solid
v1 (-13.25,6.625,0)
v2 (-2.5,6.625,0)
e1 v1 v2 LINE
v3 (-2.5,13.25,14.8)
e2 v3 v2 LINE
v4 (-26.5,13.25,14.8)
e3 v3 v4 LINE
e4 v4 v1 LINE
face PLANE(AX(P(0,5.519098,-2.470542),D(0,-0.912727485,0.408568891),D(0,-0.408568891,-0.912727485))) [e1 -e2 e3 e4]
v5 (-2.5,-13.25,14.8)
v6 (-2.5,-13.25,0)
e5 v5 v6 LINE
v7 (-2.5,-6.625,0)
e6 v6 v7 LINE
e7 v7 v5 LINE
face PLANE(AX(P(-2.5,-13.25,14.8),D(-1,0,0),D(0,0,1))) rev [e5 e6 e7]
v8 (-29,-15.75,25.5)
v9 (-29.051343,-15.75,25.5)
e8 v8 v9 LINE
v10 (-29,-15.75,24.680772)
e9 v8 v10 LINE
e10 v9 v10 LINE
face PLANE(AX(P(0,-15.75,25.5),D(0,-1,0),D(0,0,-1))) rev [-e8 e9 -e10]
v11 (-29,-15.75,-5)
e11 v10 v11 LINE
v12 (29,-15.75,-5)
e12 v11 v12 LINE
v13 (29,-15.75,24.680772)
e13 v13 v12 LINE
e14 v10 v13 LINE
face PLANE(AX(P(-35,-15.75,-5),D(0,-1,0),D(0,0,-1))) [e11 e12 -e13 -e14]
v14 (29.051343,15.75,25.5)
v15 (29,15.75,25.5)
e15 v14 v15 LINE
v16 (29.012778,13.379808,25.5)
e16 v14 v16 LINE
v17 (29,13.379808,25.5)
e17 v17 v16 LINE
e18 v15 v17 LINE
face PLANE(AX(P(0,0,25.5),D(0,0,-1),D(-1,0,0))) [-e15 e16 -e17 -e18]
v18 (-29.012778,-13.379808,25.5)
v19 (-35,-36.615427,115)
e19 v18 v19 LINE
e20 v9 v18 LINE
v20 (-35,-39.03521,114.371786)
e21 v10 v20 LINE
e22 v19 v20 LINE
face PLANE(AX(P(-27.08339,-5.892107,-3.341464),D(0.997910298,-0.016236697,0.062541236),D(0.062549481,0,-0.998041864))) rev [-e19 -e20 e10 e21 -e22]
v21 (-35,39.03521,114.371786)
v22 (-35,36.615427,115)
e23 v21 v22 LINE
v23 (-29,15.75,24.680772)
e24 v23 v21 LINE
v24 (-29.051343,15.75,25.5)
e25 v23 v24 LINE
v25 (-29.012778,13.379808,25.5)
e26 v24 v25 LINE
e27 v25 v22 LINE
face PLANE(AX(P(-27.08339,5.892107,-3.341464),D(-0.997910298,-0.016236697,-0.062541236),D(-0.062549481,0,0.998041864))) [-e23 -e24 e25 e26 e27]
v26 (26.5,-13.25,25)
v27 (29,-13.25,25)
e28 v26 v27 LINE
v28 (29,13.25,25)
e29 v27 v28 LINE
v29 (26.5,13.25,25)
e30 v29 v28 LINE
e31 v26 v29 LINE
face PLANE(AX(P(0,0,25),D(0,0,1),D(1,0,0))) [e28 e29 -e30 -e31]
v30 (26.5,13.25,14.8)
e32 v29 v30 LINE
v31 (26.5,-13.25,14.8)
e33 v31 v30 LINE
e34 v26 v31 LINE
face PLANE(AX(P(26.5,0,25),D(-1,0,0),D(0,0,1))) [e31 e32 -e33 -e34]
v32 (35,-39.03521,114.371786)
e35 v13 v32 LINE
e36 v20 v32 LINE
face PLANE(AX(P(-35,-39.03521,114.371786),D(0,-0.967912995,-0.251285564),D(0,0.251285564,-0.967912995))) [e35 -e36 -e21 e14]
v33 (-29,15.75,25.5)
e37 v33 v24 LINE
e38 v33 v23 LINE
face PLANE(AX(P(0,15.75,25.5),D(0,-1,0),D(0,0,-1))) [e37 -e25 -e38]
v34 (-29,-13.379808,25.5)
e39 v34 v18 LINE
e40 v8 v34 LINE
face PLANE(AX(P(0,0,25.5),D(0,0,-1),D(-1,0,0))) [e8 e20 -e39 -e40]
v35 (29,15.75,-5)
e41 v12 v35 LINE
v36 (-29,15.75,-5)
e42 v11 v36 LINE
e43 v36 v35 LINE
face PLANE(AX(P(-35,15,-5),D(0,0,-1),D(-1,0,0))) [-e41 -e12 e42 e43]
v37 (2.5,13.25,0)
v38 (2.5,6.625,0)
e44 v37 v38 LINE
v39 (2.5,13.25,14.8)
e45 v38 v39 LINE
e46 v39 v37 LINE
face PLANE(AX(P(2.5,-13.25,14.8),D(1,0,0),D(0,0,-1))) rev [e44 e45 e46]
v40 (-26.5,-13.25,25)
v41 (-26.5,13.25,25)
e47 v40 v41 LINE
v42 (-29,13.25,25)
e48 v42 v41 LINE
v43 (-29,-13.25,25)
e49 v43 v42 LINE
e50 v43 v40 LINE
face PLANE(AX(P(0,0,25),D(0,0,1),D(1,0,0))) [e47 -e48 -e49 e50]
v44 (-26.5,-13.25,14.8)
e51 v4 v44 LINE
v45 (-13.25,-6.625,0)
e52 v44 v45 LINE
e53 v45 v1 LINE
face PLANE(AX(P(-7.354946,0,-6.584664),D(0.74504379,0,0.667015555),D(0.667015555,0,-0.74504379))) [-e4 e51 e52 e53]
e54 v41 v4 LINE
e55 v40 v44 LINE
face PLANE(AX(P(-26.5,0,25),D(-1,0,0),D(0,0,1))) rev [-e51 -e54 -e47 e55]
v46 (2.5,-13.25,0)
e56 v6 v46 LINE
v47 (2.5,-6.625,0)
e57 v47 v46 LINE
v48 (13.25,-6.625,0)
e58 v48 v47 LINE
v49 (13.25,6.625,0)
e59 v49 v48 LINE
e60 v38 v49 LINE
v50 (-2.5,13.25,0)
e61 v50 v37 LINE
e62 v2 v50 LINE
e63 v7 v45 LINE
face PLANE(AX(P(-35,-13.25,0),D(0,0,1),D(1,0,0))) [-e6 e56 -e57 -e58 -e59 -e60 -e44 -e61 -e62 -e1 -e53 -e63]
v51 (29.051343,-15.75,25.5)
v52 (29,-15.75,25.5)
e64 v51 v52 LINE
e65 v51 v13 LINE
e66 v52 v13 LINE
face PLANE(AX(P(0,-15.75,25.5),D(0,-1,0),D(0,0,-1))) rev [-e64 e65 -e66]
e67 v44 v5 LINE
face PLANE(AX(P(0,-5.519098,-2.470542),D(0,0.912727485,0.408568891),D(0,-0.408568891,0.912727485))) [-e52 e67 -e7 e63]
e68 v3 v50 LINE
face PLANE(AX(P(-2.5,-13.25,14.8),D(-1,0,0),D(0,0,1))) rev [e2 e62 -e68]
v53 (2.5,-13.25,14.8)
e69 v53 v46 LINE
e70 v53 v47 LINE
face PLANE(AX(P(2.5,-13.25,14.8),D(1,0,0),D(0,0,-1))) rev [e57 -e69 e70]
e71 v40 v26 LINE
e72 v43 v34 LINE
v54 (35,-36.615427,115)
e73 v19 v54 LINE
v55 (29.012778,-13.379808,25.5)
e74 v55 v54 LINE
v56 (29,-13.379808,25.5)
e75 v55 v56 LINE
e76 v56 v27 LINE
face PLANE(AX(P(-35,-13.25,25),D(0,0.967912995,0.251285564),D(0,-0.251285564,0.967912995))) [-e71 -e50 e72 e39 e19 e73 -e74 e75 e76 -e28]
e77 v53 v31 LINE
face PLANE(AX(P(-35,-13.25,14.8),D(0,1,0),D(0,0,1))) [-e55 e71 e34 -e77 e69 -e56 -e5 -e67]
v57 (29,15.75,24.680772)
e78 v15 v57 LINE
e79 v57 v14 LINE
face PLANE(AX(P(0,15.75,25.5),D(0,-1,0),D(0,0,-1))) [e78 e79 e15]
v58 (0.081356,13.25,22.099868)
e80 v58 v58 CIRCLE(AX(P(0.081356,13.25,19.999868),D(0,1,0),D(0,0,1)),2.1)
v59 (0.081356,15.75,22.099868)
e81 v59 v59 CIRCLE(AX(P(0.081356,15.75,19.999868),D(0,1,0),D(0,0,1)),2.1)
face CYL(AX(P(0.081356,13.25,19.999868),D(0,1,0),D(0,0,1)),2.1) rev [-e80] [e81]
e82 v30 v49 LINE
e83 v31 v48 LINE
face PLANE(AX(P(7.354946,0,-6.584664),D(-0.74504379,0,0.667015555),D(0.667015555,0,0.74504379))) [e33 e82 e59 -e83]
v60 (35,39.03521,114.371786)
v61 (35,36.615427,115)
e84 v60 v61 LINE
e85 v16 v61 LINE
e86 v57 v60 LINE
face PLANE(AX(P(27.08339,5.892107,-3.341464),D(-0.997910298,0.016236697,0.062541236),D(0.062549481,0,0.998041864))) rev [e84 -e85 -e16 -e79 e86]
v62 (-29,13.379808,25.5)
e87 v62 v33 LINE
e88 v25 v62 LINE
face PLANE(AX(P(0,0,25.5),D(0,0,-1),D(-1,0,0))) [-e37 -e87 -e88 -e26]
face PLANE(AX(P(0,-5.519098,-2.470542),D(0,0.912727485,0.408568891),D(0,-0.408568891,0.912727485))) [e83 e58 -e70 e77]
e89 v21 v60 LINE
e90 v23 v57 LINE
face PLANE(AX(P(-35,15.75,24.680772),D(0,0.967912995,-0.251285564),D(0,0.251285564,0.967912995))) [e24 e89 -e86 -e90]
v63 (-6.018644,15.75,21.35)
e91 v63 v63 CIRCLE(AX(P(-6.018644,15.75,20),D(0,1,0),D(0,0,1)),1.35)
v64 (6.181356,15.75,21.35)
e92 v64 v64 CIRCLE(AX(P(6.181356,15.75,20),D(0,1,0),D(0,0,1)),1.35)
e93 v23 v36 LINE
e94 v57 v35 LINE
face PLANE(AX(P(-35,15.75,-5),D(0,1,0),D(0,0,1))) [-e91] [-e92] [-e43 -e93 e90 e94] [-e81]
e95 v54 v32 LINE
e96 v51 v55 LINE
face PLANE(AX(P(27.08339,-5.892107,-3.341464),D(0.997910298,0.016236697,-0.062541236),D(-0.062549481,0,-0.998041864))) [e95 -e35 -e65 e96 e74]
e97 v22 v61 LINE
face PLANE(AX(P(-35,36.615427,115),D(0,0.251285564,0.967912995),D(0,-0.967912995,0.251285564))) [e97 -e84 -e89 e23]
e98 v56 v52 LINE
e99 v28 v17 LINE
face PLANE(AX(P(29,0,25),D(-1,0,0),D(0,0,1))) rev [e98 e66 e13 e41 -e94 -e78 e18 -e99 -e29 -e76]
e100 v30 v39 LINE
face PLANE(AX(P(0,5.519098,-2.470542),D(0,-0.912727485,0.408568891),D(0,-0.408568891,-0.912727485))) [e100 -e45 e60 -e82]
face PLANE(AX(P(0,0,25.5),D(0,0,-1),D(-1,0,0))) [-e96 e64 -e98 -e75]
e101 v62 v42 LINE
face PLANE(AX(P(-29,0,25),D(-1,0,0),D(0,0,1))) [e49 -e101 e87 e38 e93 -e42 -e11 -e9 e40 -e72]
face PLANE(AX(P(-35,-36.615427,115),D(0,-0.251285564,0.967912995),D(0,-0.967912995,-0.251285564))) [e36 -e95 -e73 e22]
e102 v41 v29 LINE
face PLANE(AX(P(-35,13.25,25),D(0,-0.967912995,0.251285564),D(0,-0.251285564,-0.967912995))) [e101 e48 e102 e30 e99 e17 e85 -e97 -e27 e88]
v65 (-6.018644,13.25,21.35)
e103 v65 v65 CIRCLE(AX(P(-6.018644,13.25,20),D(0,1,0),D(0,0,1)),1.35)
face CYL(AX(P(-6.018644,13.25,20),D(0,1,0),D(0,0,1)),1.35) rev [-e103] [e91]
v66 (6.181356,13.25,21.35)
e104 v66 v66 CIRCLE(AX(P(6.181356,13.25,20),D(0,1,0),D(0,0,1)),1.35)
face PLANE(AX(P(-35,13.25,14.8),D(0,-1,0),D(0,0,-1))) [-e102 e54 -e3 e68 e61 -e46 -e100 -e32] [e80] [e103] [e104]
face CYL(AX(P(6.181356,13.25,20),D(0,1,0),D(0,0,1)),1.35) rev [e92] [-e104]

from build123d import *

# Parameters (mm, degrees)
CROQUIS1_W                   = 53
CROQUIS1_H                   = 26.5
SALIENTE_EXTRUIR1_DEPTH      = 14.8
CROQUIS8_W                   = 5
CROQUIS8_H                   = 26.5
CORTAR_EXTRUIR2_DEPTH        = 14.8
SALIENTE_EXTRUIR2_DEPTH      = 35
SALIENTE_EXTRUIR2_DEPTH_BACK = 35
CROQUIS12_W                  = 2.5
CROQUIS12_H                  = 26.5
SALIENTE_EXTRUIR3_DEPTH      = 25
CROQUIS13_W                  = 6
CROQUIS13_H                  = 29.680771502
CORTAR_EXTRUIR3_DEPTH        = 31.5
CORTAR_EXTRUIR13_DEPTH       = 2.5
CORTAR_EXTRUIR14_DEPTH       = 2.5
CROQUIS17_W                  = 6
CROQUIS17_H                  = 31.5
CORTAR_EXTRUIR11_DEPTH       = 30.5
CROQUIS18_R                  = 2.1
CROQUIS18_R_2                = 1.35
CORTAR_EXTRUIR12_DEPTH       = 2.5


with BuildPart() as part:
    # Croquis1 → Saliente-Extruir1 (new body)
    with BuildSketch(Plane.XY):
        Rectangle(CROQUIS1_W, CROQUIS1_H)
    extrude(amount=SALIENTE_EXTRUIR1_DEPTH)

    # Croquis5 → Cortar-Recubrir3 section 0
    with BuildSketch(Plane.XY.offset(14.8)):
        with BuildLine():
            Line((-26.5, 13.25), (-26.5, -13.25))
            Line((-26.5, -13.25), (26.5, -13.25))
            Line((26.5, -13.25), (26.5, 13.25))
            Line((26.5, 13.25), (-26.5, 13.25))
        make_face()
    # Croquis6 → Cortar-Recubrir3 section 1
    with BuildSketch(Plane(origin=(0, 0, 0), x_dir=(-1, 0, 0), z_dir=(0, 0, -1))):
        with BuildLine():
            Line((-13.25, -6.625), (13.25, -6.625))
            Line((13.25, -6.625), (13.25, 6.625))
            Line((13.25, 6.625), (-13.25, 6.625))
            Line((-13.25, 6.625), (-13.25, -6.625))
        make_face()
    loft(mode=Mode.SUBTRACT)

    # Croquis8 → Cortar-Extruir2 (cut)
    with BuildSketch(Plane(origin=(0, 0, 0), x_dir=(-1, 0, 0), z_dir=(0, 0, -1))):
        Rectangle(CROQUIS8_W, CROQUIS8_H)
    extrude(amount=-CORTAR_EXTRUIR2_DEPTH, mode=Mode.SUBTRACT)


with BuildPart() as cortar_extruir2_piece_1:
    # of the separate pieces the step leaves, piece 1, a body of its own (cortar_extruir2_pieces)
    add(part.part.solids().sort_by_distance((-26.5, -13.25, 0))[0])



with BuildPart() as cortar_extruir2_piece_2:
    # of the separate pieces the step leaves, piece 2, a body of its own (cortar_extruir2_pieces)
    add(part.part.solids().sort_by_distance((2.5, -13.25, 0))[0])


with BuildPart() as cortar_extruir2_piece_1_1:
    add(cortar_extruir2_piece_1.part)

    add(cortar_extruir2_piece_2.part)  # Saliente-Extruir2 merges Cortar-Extruir2 piece 2
    # Croquis10 → Saliente-Extruir2 (add, two sides: drawn at the far end of the back side and taken through both)
    with BuildSketch(Plane(origin=(0, 0, 0), x_dir=(0, 0, -1), z_dir=(1, 0, 0)).offset(-SALIENTE_EXTRUIR2_DEPTH_BACK)):
        Polygon((-14.8, 13.25), (-25, 13.25), (-115, 36.615427319), (-114.371786091, 39.035209806), (-24.680771502, 15.75), (5, 15.75), (5, 15), (5, -15.75), (-24.680771502, -15.75), (-114.371786091, -39.035209806), (-115, -36.615427319), (-25, -13.25), (-14.8, -13.25), (0, -13.25), (0, 13.25), align=None)
    extrude(amount=SALIENTE_EXTRUIR2_DEPTH + SALIENTE_EXTRUIR2_DEPTH_BACK)

    # Croquis12 → Saliente-Extruir3 (add)
    with BuildSketch(Plane.XY):
        with Locations((-27.75, 0)):
            Rectangle(CROQUIS12_W, CROQUIS12_H)
        with Locations((27.75, 0)):
            Rectangle(CROQUIS12_W, CROQUIS12_H)
    extrude(amount=SALIENTE_EXTRUIR3_DEPTH)

    # Croquis13 → Cortar-Extruir3 (cut)
    with BuildSketch(Plane(origin=(0, 15.75, 0), x_dir=(1, 0, 0), z_dir=(0, 1, 0))):
        with Locations((-32, -9.840385751)):
            Rectangle(CROQUIS13_W, CROQUIS13_H)
        with Locations((32, -9.840385751)):
            Rectangle(CROQUIS13_W, CROQUIS13_H)
    extrude(amount=-CORTAR_EXTRUIR3_DEPTH, mode=Mode.SUBTRACT)

    # Croquis14 → Cortar-Extruir13 (cut)
    with BuildSketch(Plane(origin=(0, 8.752554668, -2.272301999), x_dir=(1, 0, 0), z_dir=(0, 0.9679129947926777, -0.25128556367501503))):
        Polygon((35, -27.846587086), (29, -27.846587086), (35, -120.510922694), align=None)
        Polygon((-35, -27.846587086), (-35, -120.510922694), (-29, -27.846587086), align=None)
    extrude(amount=-CORTAR_EXTRUIR13_DEPTH, mode=Mode.SUBTRACT)

    # Croquis16 → Cortar-Extruir14 (cut)
    with BuildSketch(Plane(origin=(0, -8.752554668, -2.272301999), x_dir=(1, 0, 0), z_dir=(0, -0.9679129947926624, -0.25128556367507404))):
        Polygon((-35, 27.846587086), (-29, 27.846587086), (-35, 120.510922694), align=None)
        Polygon((35, 27.846587086), (35, 120.510922694), (29, 27.846587086), align=None)
    extrude(amount=-CORTAR_EXTRUIR14_DEPTH, mode=Mode.SUBTRACT)

    # Croquis17 → Cortar-Extruir11 (cut)
    with BuildSketch(Plane(origin=(0, 0, -5), x_dir=(-1, 0, 0), z_dir=(0, 0, -1))):
        with Locations((-32, 0)):
            Rectangle(CROQUIS17_W, CROQUIS17_H)
        with Locations((32, 0)):
            Rectangle(CROQUIS17_W, CROQUIS17_H)
    extrude(amount=-CORTAR_EXTRUIR11_DEPTH, mode=Mode.SUBTRACT)

    # Croquis18 → Cortar-Extruir12 (cut)
    with BuildSketch(Plane(origin=(0, 15.75, 0), x_dir=(1, 0, 0), z_dir=(0, 1, 0))):
        with Locations((0.081355667, -19.999867625)):
            Circle(CROQUIS18_R)
        with Locations((6.181355666, -20)):
            Circle(CROQUIS18_R_2)
        with Locations((-6.018644331, -20)):
            Circle(CROQUIS18_R_2)
    extrude(amount=-CORTAR_EXTRUIR12_DEPTH, mode=Mode.SUBTRACT)


solid = cortar_extruir2_piece_1_1.part
